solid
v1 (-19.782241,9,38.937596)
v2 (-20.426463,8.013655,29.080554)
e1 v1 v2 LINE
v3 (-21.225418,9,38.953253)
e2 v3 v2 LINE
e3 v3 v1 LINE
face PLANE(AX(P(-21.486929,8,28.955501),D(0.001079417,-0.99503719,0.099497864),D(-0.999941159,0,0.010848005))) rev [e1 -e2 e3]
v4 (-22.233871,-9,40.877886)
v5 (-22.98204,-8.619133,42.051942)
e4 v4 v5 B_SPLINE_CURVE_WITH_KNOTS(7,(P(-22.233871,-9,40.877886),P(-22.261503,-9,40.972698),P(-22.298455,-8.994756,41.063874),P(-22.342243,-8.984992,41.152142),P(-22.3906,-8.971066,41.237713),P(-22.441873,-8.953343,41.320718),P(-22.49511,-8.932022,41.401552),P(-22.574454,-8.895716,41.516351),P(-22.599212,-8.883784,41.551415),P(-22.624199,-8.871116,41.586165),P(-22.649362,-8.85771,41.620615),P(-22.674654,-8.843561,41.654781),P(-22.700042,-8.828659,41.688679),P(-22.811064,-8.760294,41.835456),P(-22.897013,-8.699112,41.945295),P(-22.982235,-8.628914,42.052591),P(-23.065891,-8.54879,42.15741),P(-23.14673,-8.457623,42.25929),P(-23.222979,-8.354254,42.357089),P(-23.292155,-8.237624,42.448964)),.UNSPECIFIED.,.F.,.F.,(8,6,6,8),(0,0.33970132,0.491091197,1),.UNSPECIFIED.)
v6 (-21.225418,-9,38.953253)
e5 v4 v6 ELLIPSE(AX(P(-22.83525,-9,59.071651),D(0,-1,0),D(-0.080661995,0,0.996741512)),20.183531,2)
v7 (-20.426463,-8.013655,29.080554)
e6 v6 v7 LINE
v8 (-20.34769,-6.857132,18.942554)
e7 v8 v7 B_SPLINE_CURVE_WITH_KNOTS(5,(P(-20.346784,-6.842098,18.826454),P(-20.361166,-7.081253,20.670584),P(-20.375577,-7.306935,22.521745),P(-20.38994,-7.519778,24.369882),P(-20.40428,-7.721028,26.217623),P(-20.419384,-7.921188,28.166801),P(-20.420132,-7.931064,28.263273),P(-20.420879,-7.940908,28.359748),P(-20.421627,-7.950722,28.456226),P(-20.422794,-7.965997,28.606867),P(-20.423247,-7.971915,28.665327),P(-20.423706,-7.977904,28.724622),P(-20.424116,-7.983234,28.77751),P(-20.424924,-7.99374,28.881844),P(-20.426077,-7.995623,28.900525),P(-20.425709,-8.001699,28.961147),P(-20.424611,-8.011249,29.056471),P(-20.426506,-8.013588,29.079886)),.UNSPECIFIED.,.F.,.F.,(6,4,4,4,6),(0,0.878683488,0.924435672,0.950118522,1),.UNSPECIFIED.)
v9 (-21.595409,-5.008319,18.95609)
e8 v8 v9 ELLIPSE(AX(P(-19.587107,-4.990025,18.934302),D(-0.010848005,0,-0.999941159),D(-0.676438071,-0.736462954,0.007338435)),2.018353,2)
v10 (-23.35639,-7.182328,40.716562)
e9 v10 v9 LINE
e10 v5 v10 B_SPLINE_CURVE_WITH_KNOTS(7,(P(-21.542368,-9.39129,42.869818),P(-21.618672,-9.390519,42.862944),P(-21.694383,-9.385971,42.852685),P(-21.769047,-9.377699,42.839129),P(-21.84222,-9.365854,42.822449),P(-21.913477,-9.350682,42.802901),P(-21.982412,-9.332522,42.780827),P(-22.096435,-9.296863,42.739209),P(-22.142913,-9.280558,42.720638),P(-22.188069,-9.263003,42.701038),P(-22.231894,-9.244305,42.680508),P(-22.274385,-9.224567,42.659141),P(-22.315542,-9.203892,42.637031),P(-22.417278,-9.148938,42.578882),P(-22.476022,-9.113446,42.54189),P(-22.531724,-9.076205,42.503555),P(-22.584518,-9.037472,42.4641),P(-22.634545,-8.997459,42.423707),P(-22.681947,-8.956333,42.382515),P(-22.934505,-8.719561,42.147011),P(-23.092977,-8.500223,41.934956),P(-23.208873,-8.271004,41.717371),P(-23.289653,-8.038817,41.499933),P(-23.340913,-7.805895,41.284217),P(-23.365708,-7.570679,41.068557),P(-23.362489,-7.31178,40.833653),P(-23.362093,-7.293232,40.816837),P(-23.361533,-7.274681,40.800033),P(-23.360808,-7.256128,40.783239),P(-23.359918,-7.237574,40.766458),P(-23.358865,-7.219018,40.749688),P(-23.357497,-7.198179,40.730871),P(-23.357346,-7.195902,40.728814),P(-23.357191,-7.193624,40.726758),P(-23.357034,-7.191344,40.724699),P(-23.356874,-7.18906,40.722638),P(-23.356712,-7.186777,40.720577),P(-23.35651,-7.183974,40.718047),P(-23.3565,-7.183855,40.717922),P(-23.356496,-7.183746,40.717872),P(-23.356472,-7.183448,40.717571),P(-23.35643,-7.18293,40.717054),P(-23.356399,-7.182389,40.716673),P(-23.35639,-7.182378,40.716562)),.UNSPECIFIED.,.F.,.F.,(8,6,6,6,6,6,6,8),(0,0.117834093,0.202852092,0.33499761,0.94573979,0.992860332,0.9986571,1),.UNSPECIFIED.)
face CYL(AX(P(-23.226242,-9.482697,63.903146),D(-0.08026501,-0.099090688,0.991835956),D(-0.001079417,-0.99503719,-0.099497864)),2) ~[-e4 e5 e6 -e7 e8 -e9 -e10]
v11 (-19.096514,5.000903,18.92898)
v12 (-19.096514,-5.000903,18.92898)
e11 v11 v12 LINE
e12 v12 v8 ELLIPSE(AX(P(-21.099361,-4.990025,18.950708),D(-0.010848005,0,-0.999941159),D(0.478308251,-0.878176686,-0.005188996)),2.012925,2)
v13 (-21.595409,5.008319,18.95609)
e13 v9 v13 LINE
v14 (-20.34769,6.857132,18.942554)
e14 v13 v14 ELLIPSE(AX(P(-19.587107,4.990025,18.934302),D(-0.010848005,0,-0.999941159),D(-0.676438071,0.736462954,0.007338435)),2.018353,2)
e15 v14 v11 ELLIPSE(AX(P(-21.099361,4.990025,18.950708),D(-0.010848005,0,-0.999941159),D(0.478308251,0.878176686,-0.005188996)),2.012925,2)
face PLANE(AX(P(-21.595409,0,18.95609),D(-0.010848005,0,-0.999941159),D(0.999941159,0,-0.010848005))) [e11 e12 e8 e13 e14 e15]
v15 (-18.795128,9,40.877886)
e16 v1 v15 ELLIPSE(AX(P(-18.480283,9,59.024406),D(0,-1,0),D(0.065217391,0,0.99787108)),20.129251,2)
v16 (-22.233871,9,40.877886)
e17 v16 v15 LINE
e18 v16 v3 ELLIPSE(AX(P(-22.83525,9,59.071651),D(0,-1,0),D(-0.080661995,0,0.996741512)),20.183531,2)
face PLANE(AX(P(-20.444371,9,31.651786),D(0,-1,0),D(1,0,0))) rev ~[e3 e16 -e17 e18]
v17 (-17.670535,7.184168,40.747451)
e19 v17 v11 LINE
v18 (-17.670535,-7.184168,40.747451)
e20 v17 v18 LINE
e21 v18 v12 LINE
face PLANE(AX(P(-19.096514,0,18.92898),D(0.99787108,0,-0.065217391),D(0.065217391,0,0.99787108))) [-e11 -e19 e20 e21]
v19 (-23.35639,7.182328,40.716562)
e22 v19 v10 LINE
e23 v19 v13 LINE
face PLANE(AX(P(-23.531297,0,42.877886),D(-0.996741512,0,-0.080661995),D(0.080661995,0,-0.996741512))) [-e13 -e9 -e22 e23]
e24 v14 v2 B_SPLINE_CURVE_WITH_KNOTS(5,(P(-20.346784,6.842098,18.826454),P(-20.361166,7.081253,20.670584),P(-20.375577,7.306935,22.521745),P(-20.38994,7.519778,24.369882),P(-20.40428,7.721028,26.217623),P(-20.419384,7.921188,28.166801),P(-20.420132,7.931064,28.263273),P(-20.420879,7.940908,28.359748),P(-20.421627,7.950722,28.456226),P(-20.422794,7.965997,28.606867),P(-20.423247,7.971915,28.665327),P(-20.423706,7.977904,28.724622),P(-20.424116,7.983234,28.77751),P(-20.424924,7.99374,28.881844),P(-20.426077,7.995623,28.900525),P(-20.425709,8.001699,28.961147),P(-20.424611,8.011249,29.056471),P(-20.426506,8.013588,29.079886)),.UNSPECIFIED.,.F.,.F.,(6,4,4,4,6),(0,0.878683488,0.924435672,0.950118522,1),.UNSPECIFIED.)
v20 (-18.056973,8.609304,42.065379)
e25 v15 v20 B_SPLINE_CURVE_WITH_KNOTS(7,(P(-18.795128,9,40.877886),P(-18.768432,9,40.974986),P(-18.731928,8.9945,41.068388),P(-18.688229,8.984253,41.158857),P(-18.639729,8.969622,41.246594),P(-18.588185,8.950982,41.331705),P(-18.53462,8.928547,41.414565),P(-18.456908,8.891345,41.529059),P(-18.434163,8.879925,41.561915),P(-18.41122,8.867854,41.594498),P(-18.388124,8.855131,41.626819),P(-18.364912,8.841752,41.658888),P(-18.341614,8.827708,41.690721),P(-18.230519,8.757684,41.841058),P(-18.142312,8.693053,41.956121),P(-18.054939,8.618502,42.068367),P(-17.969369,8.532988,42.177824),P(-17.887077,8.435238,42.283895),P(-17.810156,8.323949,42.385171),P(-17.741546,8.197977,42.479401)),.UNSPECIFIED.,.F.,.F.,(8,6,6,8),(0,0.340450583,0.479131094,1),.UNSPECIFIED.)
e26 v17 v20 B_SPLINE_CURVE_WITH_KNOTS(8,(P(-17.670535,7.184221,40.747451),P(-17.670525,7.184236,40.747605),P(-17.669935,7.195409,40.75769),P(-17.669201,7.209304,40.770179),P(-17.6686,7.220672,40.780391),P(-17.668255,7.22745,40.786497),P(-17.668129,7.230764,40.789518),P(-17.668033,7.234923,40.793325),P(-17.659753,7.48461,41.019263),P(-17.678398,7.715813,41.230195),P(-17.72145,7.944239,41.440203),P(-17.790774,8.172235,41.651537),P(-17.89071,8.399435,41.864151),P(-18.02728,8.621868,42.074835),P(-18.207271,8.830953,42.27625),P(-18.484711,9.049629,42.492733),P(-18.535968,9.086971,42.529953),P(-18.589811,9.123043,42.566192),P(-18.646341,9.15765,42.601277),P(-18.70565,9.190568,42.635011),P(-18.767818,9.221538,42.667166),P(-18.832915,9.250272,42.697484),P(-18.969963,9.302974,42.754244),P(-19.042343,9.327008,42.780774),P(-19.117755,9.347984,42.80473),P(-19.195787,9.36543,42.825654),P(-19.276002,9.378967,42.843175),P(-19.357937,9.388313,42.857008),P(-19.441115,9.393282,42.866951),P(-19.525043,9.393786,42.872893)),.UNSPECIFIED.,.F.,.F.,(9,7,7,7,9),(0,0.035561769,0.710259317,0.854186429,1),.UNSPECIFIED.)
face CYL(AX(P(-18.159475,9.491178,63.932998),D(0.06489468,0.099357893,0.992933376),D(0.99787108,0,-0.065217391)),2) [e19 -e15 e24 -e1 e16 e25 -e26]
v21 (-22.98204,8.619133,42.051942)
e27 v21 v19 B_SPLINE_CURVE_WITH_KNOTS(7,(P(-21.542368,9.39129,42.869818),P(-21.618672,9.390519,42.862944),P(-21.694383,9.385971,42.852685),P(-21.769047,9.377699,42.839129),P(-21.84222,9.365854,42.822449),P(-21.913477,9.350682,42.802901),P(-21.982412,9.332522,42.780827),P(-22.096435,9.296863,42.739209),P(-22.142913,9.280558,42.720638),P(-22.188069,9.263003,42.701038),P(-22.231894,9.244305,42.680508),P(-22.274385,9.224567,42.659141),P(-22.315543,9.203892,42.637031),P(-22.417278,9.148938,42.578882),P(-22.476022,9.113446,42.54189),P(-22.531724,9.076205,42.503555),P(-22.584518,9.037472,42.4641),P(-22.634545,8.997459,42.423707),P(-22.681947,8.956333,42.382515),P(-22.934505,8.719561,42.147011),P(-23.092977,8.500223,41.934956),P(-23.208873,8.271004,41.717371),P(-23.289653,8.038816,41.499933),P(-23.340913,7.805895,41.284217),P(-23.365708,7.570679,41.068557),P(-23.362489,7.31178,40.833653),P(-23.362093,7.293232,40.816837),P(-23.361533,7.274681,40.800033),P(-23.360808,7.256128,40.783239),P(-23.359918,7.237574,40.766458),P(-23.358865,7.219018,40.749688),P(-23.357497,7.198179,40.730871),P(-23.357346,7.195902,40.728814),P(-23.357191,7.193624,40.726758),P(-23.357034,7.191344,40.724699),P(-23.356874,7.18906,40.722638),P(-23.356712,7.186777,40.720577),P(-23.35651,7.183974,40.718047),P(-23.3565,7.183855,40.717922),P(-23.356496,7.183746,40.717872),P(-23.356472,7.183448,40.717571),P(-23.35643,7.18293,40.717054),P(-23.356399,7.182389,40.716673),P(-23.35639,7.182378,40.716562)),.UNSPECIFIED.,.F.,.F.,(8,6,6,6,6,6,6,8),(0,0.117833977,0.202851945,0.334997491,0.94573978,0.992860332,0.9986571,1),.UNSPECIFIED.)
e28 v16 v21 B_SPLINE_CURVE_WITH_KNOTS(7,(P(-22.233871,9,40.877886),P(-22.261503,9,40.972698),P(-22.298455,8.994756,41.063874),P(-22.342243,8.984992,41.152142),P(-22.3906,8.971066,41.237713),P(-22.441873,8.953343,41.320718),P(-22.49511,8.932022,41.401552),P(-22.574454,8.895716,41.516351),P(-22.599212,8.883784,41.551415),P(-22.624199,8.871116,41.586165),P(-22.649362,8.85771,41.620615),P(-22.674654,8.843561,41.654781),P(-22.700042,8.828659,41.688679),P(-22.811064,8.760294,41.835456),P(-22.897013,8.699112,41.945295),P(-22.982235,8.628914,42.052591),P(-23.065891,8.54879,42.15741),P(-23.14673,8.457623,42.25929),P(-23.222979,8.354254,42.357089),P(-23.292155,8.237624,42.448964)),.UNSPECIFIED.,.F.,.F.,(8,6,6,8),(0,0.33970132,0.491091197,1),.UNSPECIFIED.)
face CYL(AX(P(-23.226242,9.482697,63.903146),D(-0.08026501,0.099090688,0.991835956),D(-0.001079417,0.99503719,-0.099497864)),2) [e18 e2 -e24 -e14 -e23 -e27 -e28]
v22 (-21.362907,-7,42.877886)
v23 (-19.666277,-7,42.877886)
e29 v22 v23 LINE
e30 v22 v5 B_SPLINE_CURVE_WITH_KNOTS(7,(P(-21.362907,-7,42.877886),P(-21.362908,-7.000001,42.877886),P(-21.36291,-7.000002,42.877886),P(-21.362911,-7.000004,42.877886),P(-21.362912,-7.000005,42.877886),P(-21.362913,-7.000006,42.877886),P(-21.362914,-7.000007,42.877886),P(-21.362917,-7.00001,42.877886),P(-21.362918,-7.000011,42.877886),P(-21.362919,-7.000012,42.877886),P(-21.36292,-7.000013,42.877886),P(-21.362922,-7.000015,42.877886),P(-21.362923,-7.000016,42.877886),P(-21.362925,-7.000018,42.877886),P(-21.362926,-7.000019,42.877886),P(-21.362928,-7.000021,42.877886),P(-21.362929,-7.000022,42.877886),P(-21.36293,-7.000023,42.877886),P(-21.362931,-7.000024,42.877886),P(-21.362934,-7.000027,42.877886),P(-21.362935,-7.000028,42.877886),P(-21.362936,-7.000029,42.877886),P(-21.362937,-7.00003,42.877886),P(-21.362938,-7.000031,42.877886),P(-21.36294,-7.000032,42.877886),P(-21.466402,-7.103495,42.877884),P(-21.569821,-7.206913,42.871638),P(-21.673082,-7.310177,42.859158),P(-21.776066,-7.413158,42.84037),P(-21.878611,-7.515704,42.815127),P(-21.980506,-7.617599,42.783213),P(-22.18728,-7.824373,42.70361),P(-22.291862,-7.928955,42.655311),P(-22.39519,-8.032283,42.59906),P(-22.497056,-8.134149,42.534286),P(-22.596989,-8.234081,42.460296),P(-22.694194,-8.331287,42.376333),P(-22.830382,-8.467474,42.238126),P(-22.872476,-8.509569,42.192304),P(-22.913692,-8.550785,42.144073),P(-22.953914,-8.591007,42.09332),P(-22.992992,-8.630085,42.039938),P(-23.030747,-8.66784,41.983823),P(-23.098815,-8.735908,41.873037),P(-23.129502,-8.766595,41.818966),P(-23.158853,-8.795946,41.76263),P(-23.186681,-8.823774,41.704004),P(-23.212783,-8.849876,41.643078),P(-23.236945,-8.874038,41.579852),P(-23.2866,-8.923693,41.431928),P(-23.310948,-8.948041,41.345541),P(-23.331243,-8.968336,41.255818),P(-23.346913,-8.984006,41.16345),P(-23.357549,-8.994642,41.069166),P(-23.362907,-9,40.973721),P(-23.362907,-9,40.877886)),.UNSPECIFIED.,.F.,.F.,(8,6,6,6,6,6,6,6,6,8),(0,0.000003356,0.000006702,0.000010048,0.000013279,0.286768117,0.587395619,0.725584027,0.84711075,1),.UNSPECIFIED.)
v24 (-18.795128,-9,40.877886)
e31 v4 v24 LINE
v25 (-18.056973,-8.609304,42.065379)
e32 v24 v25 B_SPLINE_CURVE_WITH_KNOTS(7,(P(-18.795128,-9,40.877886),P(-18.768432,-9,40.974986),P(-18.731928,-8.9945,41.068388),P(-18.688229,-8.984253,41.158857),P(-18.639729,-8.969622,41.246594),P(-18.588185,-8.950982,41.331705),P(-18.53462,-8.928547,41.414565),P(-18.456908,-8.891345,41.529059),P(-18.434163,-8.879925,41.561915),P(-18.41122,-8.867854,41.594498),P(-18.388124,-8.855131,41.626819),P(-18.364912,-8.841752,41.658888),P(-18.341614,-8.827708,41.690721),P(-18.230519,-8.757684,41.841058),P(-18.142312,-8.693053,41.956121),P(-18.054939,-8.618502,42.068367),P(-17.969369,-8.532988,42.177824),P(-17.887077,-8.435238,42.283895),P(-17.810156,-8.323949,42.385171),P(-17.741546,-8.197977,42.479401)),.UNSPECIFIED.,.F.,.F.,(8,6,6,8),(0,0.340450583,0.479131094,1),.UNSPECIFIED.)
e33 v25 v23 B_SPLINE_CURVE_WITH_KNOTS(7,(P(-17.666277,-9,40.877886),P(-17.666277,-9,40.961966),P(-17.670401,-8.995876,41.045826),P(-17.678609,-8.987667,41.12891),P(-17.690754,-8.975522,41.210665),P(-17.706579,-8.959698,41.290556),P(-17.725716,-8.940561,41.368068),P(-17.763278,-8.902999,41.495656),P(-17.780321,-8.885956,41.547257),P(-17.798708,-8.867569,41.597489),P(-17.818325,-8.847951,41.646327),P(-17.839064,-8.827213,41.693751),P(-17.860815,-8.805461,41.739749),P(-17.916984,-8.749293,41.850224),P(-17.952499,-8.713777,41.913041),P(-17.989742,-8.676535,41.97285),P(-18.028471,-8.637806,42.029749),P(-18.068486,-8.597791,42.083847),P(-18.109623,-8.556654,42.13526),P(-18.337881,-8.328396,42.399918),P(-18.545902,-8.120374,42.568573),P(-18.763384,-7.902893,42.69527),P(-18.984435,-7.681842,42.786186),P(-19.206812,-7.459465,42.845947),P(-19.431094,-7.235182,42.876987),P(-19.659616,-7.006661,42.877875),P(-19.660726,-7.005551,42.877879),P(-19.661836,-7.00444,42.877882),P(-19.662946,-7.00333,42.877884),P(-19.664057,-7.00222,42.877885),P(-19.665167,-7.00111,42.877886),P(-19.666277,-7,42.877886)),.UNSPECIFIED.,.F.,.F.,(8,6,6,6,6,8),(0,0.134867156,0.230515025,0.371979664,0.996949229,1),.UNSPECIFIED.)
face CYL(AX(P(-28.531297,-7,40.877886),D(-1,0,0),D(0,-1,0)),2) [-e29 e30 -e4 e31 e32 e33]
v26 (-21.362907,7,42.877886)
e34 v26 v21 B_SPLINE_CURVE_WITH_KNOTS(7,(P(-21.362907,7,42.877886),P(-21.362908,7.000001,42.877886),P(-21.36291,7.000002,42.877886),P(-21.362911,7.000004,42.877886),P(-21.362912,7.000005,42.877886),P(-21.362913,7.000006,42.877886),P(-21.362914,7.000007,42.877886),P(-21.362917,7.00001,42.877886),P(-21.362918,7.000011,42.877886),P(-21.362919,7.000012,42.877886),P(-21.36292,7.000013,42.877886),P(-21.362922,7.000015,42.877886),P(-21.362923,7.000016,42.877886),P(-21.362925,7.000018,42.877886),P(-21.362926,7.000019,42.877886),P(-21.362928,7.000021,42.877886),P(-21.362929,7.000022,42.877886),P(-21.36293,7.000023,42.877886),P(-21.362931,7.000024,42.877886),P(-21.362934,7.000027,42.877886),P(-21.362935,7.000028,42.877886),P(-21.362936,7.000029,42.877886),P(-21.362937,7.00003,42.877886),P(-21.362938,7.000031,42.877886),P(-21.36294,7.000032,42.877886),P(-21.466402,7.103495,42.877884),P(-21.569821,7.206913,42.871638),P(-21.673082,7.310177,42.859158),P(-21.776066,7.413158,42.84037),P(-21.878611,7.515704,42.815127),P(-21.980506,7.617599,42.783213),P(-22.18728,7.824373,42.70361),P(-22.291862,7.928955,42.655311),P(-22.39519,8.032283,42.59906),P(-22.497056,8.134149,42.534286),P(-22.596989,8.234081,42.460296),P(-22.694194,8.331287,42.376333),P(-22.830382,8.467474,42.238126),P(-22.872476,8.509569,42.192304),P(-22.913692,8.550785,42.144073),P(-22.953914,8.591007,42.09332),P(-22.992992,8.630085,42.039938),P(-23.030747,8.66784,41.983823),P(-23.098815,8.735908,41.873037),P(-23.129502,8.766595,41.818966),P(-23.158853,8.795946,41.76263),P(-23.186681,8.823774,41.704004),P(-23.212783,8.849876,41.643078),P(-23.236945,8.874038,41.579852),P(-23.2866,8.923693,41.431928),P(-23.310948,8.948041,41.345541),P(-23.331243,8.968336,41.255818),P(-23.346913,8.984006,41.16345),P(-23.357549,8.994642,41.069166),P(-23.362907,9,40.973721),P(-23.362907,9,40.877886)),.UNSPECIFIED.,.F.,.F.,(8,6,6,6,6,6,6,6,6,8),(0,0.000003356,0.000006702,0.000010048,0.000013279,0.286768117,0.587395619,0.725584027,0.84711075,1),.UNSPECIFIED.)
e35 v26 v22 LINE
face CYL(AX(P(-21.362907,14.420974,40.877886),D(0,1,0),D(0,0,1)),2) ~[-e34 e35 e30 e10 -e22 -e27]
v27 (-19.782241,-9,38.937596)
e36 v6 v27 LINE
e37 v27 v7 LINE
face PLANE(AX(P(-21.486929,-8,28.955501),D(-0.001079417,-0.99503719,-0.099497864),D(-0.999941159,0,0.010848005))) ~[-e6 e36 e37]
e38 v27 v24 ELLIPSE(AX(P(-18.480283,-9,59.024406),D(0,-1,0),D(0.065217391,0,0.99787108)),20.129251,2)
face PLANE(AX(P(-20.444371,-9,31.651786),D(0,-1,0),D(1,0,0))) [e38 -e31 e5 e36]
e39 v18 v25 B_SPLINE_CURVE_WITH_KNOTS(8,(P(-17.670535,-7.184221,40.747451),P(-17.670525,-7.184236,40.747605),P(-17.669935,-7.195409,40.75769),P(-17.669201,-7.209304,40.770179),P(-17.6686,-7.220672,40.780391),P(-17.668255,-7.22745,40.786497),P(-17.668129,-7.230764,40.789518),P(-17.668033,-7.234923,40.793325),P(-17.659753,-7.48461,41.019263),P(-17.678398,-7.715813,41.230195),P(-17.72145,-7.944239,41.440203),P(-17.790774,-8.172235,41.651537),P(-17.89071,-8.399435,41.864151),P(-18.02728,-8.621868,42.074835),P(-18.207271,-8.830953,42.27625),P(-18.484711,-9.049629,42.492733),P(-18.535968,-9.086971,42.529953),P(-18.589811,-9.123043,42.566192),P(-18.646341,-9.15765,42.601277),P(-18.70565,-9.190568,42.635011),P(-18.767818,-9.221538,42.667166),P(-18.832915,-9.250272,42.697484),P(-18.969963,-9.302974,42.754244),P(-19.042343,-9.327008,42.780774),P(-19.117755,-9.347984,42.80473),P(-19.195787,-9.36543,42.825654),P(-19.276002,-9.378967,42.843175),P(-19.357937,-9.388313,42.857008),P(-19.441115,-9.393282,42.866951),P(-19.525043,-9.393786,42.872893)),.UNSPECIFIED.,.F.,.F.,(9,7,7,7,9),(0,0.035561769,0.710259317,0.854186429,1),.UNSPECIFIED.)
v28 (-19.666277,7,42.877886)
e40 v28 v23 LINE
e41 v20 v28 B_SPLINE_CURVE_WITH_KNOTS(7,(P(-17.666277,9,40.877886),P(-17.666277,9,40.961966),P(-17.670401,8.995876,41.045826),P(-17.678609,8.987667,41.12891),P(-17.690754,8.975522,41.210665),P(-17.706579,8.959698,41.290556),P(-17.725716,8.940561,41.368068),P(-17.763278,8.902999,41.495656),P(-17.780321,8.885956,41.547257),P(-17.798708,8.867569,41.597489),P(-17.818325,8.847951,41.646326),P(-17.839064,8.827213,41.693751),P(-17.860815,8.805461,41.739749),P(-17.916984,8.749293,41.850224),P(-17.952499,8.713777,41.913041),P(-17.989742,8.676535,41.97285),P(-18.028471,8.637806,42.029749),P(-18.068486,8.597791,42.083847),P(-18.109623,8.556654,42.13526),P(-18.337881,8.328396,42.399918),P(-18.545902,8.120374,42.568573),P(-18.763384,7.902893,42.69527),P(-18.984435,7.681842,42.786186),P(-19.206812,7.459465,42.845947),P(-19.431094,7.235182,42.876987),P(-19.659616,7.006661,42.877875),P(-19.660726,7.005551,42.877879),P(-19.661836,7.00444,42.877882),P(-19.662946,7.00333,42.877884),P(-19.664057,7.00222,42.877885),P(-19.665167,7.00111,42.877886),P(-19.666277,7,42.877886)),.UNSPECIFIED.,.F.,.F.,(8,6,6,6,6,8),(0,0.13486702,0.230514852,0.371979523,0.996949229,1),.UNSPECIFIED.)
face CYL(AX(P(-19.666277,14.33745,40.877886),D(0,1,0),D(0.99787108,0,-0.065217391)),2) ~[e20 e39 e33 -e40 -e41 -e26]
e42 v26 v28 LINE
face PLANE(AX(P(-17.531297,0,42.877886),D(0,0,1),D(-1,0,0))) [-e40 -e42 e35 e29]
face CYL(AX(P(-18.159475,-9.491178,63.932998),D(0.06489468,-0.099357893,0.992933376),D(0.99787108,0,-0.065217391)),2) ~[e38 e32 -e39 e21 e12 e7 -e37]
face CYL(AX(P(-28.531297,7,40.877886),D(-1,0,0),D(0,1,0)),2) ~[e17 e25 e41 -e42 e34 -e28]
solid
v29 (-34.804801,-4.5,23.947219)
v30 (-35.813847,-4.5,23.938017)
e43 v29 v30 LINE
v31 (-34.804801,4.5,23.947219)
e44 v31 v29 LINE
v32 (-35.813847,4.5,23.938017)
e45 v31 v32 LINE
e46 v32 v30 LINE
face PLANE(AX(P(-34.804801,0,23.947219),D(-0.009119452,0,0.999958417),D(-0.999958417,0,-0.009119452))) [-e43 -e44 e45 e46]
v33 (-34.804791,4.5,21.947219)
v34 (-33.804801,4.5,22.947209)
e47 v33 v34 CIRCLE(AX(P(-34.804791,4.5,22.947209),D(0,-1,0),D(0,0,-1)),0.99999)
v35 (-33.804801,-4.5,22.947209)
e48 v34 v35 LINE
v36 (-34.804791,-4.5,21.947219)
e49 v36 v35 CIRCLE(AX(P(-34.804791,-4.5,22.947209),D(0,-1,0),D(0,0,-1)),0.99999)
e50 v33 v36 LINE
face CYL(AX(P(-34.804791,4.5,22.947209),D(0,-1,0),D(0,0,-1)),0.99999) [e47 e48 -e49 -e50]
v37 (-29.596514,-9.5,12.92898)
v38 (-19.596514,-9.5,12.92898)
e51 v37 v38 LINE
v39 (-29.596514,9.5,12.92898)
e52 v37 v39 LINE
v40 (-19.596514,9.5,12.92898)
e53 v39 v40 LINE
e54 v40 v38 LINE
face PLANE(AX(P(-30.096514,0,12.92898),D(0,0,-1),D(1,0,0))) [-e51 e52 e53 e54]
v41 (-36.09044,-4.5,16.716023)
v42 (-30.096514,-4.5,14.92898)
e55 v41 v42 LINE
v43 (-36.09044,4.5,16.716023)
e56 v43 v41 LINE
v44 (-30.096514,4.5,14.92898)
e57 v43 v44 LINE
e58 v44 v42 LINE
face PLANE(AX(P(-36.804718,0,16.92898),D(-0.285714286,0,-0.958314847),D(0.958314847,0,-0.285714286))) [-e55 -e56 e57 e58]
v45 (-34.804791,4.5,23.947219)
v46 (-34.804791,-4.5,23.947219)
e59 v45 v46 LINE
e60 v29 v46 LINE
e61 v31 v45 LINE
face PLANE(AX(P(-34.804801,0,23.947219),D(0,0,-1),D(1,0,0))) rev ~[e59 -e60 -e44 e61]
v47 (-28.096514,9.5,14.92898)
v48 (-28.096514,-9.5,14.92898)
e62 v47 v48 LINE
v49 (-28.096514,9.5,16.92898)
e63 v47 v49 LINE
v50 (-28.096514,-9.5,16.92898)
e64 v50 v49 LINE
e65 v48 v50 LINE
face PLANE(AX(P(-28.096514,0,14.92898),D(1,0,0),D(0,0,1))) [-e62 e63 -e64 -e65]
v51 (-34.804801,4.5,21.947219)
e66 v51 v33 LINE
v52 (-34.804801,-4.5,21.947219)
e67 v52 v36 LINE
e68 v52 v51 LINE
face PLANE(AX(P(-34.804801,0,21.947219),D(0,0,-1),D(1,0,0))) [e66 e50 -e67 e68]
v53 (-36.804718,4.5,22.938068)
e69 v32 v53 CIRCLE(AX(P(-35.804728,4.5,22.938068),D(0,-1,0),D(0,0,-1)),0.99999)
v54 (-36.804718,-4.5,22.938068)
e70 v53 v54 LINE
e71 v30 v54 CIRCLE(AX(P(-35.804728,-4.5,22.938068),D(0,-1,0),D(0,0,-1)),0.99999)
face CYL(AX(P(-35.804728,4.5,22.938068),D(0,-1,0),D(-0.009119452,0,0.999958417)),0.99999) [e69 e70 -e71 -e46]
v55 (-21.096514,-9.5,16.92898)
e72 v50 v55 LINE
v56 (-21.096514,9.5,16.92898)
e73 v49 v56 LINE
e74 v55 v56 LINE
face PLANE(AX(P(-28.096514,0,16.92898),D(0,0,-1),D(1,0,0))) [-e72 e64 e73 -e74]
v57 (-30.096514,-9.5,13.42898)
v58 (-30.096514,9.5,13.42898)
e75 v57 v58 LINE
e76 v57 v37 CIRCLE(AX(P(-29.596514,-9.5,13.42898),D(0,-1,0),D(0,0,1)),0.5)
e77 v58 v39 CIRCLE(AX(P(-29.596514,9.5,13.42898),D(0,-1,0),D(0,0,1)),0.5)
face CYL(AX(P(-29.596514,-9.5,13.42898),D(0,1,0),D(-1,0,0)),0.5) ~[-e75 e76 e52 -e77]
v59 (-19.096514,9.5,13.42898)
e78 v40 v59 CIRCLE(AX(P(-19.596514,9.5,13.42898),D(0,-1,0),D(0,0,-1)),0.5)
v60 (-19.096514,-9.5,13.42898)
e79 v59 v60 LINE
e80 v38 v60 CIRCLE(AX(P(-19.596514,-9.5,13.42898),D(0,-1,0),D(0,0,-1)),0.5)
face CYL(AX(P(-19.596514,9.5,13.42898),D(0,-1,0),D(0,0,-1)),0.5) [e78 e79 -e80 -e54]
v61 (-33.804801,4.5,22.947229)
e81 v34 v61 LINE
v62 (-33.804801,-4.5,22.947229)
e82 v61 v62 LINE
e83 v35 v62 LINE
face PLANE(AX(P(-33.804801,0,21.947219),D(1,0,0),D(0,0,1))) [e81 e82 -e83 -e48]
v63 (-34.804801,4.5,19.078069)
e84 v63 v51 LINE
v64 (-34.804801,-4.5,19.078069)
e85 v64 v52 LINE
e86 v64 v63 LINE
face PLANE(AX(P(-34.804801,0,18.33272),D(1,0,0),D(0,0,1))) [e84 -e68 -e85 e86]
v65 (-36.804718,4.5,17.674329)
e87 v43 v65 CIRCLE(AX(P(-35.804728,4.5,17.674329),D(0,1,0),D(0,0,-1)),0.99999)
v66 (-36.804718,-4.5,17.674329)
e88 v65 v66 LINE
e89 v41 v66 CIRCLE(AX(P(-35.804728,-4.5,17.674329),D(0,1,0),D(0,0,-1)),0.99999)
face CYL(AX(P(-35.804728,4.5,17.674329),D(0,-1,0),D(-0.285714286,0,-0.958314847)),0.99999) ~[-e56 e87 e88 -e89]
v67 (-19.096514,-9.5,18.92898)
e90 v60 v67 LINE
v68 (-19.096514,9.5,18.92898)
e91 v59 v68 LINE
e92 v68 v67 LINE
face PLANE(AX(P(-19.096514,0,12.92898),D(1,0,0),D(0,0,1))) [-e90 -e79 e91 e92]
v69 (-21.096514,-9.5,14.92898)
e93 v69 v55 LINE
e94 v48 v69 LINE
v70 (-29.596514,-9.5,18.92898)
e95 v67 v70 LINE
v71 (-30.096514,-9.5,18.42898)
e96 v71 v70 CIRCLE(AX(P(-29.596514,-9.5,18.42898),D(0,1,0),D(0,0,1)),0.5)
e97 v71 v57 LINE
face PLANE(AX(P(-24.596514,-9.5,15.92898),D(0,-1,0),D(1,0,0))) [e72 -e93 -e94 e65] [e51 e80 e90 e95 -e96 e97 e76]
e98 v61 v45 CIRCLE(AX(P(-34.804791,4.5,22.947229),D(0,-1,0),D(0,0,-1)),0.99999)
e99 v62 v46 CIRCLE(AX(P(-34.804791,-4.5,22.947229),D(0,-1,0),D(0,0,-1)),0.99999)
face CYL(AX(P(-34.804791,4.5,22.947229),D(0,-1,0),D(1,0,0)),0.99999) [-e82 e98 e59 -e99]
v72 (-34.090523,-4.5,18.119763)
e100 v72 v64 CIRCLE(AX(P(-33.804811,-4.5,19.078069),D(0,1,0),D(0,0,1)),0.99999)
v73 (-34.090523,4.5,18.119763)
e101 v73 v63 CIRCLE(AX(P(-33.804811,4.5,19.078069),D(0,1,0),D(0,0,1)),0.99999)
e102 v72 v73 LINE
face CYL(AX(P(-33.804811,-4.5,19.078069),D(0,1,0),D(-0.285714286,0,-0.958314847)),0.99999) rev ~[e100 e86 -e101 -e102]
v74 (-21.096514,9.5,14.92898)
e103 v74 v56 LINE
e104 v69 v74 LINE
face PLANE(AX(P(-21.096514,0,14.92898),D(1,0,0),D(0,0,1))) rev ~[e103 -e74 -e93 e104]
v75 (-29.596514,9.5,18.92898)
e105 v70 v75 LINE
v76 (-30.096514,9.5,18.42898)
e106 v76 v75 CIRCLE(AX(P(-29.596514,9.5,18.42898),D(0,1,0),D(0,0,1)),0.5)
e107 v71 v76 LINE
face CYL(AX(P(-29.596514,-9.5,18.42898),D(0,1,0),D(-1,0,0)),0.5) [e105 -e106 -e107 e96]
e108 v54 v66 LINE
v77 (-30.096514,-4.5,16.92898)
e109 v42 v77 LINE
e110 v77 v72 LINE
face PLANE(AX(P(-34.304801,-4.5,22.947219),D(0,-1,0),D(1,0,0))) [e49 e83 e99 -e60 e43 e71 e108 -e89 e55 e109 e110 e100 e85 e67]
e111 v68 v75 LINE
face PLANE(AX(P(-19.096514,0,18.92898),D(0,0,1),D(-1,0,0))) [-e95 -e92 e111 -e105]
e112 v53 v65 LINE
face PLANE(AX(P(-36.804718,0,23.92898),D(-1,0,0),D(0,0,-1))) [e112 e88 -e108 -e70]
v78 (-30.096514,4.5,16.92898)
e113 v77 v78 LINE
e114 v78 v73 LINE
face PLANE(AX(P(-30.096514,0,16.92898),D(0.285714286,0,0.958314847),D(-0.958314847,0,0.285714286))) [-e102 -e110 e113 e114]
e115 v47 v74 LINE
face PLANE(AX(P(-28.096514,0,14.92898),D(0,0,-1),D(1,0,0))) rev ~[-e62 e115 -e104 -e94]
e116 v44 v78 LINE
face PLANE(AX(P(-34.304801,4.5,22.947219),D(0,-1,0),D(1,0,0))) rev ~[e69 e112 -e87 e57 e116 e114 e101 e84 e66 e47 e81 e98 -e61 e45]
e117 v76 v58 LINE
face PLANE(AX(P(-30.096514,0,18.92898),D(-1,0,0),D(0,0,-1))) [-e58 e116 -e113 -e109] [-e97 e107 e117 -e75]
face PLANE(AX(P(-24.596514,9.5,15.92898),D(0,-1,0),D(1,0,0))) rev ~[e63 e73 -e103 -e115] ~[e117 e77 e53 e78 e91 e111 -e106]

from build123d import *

# Parameters (mm, degrees)
F0_W         = 7
F0_H         = 2
F1_DEPTH     = 9.5
F2_DEPTH     = 9
F0_W_2       = 1
F3_DEPTH     = 4.5
F4_R         = 0.99999
F5_SIZE2     = 2
F5_SIZE      = 20
F5_2_SIZE2   = 2
F5_2_SIZE    = 20
F6_T1_DEPTH  = 49.9673321511
F6_T3_DEPTH  = 49.9117147518
F6_T5_DEPTH  = 49.9673321511
F6_T7_DEPTH  = 49.9117147518
F6_T9_DEPTH  = 28.6748999233
F6_T11_DEPTH = 28.841948309
F6_T13_DEPTH = 16
F7_R         = 0.5


# Not quite as in the source:
# - a fillet or chamfer that OpenCascade refuses, or shapes differently, is made with other operations: its cross-section is extruded or revolved along the edge and cut away or added
# - a fillet or chamfer is up to 0.001 mm smaller than in the source, because OpenCascade refuses the exact size


with BuildPart() as f1:
    # F0 (on Front) → F1 (new body, symmetric)
    with BuildSketch(Plane.XZ):
        Polygon((-30.0965141803, 12.928980055), (-19.0965141803, 12.928980055), (-19.0965141803, 18.928980055), (-30.0965141803, 18.928980055), (-30.0965141803, 16.928980055), (-30.0965141803, 14.928980055), align=None)
        with Locations((-24.5965141803, 15.928980055)):
            Rectangle(F0_W, F0_H, mode=Mode.SUBTRACT)
    extrude(amount=F1_DEPTH, both=True)

    # F0 (on Front) → F3 (join, symmetric)
    with BuildSketch(Plane.XZ):
        with Locations((-34.3048012789, 22.9472189589)):
            Rectangle(F0_W_2, F0_H)
        Polygon((-36.8047181128, 18.928980055), (-34.8048012789, 18.3327200564), (-34.8048012789, 21.9472189589), (-34.8048012789, 23.9472189589), (-36.8047181128, 23.928980055), align=None)
        Polygon((-36.8047181128, 16.928980055), (-30.0965141803, 14.928980055), (-30.0965141803, 16.928980055), (-34.8048012789, 18.3327200564), (-36.8047181128, 18.928980055), align=None)
    extrude(amount=F3_DEPTH, both=True)

    # F4 (radius 1 in the source; OpenCascade refuses exactly that, so slightly less here)
    f4_edges = [f1.edges().sort_by_distance(p)[0] for p in [
        (-36.804718, 0, 16.92898),
        (-36.804718, 0, 23.92898),
        (-33.804801, 0, 23.947219),
        (-33.804801, 0, 21.947219),
        (-34.804801, 0, 18.33272),
    ]]
    fillet(f4_edges, radius=F4_R)

    # F7
    f7_edges = [f1.edges().sort_by_distance(p)[0] for p in [
        (-30.096514, 0, 18.92898),
        (-30.096514, 0, 12.92898),
        (-19.096514, 0, 12.92898),
    ]]
    fillet(f7_edges, radius=F7_R)


with BuildPart() as f2:
    # F0 (on Front) → F2 (new body, symmetric)
    with BuildSketch(Plane.XZ):
        Polygon((-21.5954088979, 18.9560896729), (-19.0965141803, 18.928980055), (-17.531296789, 42.8778859699), (-23.531296789, 42.8778859699), align=None)
    extrude(amount=F2_DEPTH, both=True)

    # F5
    f5_edges = [f2.edges().sort_by_distance(p)[0] for p in [
        (-20.345962, -9, 18.942535),
    ]]
    f5_side = f2.faces().sort_by_distance((-20.450789, -9, 32.553702))[0]
    chamfer(f5_edges, length=F5_SIZE, length2=F5_SIZE2, reference=f5_side)

    # F5#2
    f5_2_edges = [f2.edges().sort_by_distance(p)[0] for p in [
        (-20.345962, 9, 18.942535),
    ]]
    f5_2_side = f2.faces().sort_by_distance((-20.450789, 9, 32.553702))[0]
    chamfer(f5_2_edges, length=F5_2_SIZE, length2=F5_2_SIZE2, reference=f5_2_side)

    # F6: fillet of radius 2 on 8 edges, made by hand

    # F6_s2 → F6_t1 (cut)
    with BuildSketch(Plane(origin=(4.1043145221, -6.2839672171, 62.7988437139), x_dir=(-0.8372400542, -0.5468355251, 0), z_dir=(-0.0648946801, 0.0993578929, -0.9929333762))):
        with BuildLine():
            ThreePointArc((18.7230377702, 8.4578509385), (19.9843267844, 7.5993584569), (21.4840038751, 7.8801215992))
            Line((21.4840038751, 7.8801215992), (19.8162152443, 6.7959541073))
            Line((19.8162152443, 6.7959541073), (18.7230377702, 8.4578509385))
        make_face()
    extrude(amount=F6_T1_DEPTH, mode=Mode.SUBTRACT)

    # F6_s4 → F6_t3 (cut)
    with BuildSketch(Plane(origin=(-5.3123669205, -6.5583508113, 65.6449993364), x_dir=(-0.7770579233, 0.6294290936, 0), z_dir=(0.0802650099, 0.099090688, -0.9918359561))):
        with BuildLine():
            ThreePointArc((10.8285170374, -15.2199185563), (12.2892990823, -15.648377047), (13.6285019913, -14.9245010705))
            Line((13.6285019913, -14.9245010705), (12.3748799347, -16.4595175875))
            Line((12.3748799347, -16.4595175875), (10.8285170374, -15.2199185563))
        make_face()
    extrude(amount=F6_T3_DEPTH, mode=Mode.SUBTRACT)

    # F6_s6 → F6_t5 (cut)
    with BuildSketch(Plane(origin=(4.1043145221, 6.2839672171, 62.7988437139), x_dir=(0.8372400542, -0.5468355251, 0), z_dir=(-0.0648946801, -0.0993578929, -0.9929333762))):
        with BuildLine():
            ThreePointArc((-18.7230377702, 8.4578509385), (-19.9843267844, 7.5993584569), (-21.4840038751, 7.8801215992))
            Line((-21.4840038751, 7.8801215992), (-19.8162152443, 6.7959541073))
            Line((-19.8162152443, 6.7959541073), (-18.7230377702, 8.4578509385))
        make_face()
    extrude(amount=F6_T5_DEPTH, mode=Mode.SUBTRACT)

    # F6_s8 → F6_t7 (cut)
    with BuildSketch(Plane(origin=(-5.3123669205, 6.5583508113, 65.6449993364), x_dir=(0.7770579233, 0.6294290936, 0), z_dir=(0.0802650099, -0.099090688, -0.9918359561))):
        with BuildLine():
            ThreePointArc((-10.8285170374, -15.2199185563), (-12.2892990823, -15.648377047), (-13.6285019913, -14.9245010705))
            Line((-13.6285019913, -14.9245010705), (-12.3748799347, -16.4595175875))
            Line((-12.3748799347, -16.4595175875), (-10.8285170374, -15.2199185563))
        make_face()
    extrude(amount=F6_T7_DEPTH, mode=Mode.SUBTRACT)

    # F6_s10 → F6_t9 (cut)
    with BuildSketch(Plane.XZ.offset(-14.3374499616)):
        with BuildLine():
            ThreePointArc((-17.6705346141, 40.7474511872), (-18.2066758753, 42.2452064215), (-19.6662767737, 42.8778859699))
            Line((-19.6662767737, 42.8778859699), (-17.531296789, 42.8778859699))
            Line((-17.531296789, 42.8778859699), (-17.6705346141, 40.7474511872))
        make_face()
    extrude(amount=F6_T9_DEPTH, mode=Mode.SUBTRACT)

    # F6_s12 → F6_t11 (cut)
    with BuildSketch(Plane.XZ.offset(-14.4209741545)):
        with BuildLine():
            ThreePointArc((-21.3629071272, 42.8778859699), (-22.8330513347, 42.2338638491), (-23.3563901519, 40.7165619789))
            Line((-23.3563901519, 40.7165619789), (-23.531296789, 42.8778859699))
            Line((-23.531296789, 42.8778859699), (-21.3629071272, 42.8778859699))
        make_face()
    extrude(amount=F6_T11_DEPTH, mode=Mode.SUBTRACT)

    # F6_s14 → F6_t13 (cut)
    with BuildSketch(Plane.YZ.offset(-28.531296789)):
        with BuildLine():
            ThreePointArc((-9, 40.8778859699), (-8.4142135624, 42.2920995322), (-7, 42.8778859699))
            Line((-7, 42.8778859699), (-9, 42.8778859699))
            Line((-9, 42.8778859699), (-9, 40.8778859699))
        make_face()
        with BuildLine():
            ThreePointArc((9, 40.8778859699), (8.4142135624, 42.2920995322), (7, 42.8778859699))
            Line((7, 42.8778859699), (9, 42.8778859699))
            Line((9, 42.8778859699), (9, 40.8778859699))
        make_face()
    extrude(amount=F6_T13_DEPTH, mode=Mode.SUBTRACT)


solid = Compound([f1.part, f2.part])
